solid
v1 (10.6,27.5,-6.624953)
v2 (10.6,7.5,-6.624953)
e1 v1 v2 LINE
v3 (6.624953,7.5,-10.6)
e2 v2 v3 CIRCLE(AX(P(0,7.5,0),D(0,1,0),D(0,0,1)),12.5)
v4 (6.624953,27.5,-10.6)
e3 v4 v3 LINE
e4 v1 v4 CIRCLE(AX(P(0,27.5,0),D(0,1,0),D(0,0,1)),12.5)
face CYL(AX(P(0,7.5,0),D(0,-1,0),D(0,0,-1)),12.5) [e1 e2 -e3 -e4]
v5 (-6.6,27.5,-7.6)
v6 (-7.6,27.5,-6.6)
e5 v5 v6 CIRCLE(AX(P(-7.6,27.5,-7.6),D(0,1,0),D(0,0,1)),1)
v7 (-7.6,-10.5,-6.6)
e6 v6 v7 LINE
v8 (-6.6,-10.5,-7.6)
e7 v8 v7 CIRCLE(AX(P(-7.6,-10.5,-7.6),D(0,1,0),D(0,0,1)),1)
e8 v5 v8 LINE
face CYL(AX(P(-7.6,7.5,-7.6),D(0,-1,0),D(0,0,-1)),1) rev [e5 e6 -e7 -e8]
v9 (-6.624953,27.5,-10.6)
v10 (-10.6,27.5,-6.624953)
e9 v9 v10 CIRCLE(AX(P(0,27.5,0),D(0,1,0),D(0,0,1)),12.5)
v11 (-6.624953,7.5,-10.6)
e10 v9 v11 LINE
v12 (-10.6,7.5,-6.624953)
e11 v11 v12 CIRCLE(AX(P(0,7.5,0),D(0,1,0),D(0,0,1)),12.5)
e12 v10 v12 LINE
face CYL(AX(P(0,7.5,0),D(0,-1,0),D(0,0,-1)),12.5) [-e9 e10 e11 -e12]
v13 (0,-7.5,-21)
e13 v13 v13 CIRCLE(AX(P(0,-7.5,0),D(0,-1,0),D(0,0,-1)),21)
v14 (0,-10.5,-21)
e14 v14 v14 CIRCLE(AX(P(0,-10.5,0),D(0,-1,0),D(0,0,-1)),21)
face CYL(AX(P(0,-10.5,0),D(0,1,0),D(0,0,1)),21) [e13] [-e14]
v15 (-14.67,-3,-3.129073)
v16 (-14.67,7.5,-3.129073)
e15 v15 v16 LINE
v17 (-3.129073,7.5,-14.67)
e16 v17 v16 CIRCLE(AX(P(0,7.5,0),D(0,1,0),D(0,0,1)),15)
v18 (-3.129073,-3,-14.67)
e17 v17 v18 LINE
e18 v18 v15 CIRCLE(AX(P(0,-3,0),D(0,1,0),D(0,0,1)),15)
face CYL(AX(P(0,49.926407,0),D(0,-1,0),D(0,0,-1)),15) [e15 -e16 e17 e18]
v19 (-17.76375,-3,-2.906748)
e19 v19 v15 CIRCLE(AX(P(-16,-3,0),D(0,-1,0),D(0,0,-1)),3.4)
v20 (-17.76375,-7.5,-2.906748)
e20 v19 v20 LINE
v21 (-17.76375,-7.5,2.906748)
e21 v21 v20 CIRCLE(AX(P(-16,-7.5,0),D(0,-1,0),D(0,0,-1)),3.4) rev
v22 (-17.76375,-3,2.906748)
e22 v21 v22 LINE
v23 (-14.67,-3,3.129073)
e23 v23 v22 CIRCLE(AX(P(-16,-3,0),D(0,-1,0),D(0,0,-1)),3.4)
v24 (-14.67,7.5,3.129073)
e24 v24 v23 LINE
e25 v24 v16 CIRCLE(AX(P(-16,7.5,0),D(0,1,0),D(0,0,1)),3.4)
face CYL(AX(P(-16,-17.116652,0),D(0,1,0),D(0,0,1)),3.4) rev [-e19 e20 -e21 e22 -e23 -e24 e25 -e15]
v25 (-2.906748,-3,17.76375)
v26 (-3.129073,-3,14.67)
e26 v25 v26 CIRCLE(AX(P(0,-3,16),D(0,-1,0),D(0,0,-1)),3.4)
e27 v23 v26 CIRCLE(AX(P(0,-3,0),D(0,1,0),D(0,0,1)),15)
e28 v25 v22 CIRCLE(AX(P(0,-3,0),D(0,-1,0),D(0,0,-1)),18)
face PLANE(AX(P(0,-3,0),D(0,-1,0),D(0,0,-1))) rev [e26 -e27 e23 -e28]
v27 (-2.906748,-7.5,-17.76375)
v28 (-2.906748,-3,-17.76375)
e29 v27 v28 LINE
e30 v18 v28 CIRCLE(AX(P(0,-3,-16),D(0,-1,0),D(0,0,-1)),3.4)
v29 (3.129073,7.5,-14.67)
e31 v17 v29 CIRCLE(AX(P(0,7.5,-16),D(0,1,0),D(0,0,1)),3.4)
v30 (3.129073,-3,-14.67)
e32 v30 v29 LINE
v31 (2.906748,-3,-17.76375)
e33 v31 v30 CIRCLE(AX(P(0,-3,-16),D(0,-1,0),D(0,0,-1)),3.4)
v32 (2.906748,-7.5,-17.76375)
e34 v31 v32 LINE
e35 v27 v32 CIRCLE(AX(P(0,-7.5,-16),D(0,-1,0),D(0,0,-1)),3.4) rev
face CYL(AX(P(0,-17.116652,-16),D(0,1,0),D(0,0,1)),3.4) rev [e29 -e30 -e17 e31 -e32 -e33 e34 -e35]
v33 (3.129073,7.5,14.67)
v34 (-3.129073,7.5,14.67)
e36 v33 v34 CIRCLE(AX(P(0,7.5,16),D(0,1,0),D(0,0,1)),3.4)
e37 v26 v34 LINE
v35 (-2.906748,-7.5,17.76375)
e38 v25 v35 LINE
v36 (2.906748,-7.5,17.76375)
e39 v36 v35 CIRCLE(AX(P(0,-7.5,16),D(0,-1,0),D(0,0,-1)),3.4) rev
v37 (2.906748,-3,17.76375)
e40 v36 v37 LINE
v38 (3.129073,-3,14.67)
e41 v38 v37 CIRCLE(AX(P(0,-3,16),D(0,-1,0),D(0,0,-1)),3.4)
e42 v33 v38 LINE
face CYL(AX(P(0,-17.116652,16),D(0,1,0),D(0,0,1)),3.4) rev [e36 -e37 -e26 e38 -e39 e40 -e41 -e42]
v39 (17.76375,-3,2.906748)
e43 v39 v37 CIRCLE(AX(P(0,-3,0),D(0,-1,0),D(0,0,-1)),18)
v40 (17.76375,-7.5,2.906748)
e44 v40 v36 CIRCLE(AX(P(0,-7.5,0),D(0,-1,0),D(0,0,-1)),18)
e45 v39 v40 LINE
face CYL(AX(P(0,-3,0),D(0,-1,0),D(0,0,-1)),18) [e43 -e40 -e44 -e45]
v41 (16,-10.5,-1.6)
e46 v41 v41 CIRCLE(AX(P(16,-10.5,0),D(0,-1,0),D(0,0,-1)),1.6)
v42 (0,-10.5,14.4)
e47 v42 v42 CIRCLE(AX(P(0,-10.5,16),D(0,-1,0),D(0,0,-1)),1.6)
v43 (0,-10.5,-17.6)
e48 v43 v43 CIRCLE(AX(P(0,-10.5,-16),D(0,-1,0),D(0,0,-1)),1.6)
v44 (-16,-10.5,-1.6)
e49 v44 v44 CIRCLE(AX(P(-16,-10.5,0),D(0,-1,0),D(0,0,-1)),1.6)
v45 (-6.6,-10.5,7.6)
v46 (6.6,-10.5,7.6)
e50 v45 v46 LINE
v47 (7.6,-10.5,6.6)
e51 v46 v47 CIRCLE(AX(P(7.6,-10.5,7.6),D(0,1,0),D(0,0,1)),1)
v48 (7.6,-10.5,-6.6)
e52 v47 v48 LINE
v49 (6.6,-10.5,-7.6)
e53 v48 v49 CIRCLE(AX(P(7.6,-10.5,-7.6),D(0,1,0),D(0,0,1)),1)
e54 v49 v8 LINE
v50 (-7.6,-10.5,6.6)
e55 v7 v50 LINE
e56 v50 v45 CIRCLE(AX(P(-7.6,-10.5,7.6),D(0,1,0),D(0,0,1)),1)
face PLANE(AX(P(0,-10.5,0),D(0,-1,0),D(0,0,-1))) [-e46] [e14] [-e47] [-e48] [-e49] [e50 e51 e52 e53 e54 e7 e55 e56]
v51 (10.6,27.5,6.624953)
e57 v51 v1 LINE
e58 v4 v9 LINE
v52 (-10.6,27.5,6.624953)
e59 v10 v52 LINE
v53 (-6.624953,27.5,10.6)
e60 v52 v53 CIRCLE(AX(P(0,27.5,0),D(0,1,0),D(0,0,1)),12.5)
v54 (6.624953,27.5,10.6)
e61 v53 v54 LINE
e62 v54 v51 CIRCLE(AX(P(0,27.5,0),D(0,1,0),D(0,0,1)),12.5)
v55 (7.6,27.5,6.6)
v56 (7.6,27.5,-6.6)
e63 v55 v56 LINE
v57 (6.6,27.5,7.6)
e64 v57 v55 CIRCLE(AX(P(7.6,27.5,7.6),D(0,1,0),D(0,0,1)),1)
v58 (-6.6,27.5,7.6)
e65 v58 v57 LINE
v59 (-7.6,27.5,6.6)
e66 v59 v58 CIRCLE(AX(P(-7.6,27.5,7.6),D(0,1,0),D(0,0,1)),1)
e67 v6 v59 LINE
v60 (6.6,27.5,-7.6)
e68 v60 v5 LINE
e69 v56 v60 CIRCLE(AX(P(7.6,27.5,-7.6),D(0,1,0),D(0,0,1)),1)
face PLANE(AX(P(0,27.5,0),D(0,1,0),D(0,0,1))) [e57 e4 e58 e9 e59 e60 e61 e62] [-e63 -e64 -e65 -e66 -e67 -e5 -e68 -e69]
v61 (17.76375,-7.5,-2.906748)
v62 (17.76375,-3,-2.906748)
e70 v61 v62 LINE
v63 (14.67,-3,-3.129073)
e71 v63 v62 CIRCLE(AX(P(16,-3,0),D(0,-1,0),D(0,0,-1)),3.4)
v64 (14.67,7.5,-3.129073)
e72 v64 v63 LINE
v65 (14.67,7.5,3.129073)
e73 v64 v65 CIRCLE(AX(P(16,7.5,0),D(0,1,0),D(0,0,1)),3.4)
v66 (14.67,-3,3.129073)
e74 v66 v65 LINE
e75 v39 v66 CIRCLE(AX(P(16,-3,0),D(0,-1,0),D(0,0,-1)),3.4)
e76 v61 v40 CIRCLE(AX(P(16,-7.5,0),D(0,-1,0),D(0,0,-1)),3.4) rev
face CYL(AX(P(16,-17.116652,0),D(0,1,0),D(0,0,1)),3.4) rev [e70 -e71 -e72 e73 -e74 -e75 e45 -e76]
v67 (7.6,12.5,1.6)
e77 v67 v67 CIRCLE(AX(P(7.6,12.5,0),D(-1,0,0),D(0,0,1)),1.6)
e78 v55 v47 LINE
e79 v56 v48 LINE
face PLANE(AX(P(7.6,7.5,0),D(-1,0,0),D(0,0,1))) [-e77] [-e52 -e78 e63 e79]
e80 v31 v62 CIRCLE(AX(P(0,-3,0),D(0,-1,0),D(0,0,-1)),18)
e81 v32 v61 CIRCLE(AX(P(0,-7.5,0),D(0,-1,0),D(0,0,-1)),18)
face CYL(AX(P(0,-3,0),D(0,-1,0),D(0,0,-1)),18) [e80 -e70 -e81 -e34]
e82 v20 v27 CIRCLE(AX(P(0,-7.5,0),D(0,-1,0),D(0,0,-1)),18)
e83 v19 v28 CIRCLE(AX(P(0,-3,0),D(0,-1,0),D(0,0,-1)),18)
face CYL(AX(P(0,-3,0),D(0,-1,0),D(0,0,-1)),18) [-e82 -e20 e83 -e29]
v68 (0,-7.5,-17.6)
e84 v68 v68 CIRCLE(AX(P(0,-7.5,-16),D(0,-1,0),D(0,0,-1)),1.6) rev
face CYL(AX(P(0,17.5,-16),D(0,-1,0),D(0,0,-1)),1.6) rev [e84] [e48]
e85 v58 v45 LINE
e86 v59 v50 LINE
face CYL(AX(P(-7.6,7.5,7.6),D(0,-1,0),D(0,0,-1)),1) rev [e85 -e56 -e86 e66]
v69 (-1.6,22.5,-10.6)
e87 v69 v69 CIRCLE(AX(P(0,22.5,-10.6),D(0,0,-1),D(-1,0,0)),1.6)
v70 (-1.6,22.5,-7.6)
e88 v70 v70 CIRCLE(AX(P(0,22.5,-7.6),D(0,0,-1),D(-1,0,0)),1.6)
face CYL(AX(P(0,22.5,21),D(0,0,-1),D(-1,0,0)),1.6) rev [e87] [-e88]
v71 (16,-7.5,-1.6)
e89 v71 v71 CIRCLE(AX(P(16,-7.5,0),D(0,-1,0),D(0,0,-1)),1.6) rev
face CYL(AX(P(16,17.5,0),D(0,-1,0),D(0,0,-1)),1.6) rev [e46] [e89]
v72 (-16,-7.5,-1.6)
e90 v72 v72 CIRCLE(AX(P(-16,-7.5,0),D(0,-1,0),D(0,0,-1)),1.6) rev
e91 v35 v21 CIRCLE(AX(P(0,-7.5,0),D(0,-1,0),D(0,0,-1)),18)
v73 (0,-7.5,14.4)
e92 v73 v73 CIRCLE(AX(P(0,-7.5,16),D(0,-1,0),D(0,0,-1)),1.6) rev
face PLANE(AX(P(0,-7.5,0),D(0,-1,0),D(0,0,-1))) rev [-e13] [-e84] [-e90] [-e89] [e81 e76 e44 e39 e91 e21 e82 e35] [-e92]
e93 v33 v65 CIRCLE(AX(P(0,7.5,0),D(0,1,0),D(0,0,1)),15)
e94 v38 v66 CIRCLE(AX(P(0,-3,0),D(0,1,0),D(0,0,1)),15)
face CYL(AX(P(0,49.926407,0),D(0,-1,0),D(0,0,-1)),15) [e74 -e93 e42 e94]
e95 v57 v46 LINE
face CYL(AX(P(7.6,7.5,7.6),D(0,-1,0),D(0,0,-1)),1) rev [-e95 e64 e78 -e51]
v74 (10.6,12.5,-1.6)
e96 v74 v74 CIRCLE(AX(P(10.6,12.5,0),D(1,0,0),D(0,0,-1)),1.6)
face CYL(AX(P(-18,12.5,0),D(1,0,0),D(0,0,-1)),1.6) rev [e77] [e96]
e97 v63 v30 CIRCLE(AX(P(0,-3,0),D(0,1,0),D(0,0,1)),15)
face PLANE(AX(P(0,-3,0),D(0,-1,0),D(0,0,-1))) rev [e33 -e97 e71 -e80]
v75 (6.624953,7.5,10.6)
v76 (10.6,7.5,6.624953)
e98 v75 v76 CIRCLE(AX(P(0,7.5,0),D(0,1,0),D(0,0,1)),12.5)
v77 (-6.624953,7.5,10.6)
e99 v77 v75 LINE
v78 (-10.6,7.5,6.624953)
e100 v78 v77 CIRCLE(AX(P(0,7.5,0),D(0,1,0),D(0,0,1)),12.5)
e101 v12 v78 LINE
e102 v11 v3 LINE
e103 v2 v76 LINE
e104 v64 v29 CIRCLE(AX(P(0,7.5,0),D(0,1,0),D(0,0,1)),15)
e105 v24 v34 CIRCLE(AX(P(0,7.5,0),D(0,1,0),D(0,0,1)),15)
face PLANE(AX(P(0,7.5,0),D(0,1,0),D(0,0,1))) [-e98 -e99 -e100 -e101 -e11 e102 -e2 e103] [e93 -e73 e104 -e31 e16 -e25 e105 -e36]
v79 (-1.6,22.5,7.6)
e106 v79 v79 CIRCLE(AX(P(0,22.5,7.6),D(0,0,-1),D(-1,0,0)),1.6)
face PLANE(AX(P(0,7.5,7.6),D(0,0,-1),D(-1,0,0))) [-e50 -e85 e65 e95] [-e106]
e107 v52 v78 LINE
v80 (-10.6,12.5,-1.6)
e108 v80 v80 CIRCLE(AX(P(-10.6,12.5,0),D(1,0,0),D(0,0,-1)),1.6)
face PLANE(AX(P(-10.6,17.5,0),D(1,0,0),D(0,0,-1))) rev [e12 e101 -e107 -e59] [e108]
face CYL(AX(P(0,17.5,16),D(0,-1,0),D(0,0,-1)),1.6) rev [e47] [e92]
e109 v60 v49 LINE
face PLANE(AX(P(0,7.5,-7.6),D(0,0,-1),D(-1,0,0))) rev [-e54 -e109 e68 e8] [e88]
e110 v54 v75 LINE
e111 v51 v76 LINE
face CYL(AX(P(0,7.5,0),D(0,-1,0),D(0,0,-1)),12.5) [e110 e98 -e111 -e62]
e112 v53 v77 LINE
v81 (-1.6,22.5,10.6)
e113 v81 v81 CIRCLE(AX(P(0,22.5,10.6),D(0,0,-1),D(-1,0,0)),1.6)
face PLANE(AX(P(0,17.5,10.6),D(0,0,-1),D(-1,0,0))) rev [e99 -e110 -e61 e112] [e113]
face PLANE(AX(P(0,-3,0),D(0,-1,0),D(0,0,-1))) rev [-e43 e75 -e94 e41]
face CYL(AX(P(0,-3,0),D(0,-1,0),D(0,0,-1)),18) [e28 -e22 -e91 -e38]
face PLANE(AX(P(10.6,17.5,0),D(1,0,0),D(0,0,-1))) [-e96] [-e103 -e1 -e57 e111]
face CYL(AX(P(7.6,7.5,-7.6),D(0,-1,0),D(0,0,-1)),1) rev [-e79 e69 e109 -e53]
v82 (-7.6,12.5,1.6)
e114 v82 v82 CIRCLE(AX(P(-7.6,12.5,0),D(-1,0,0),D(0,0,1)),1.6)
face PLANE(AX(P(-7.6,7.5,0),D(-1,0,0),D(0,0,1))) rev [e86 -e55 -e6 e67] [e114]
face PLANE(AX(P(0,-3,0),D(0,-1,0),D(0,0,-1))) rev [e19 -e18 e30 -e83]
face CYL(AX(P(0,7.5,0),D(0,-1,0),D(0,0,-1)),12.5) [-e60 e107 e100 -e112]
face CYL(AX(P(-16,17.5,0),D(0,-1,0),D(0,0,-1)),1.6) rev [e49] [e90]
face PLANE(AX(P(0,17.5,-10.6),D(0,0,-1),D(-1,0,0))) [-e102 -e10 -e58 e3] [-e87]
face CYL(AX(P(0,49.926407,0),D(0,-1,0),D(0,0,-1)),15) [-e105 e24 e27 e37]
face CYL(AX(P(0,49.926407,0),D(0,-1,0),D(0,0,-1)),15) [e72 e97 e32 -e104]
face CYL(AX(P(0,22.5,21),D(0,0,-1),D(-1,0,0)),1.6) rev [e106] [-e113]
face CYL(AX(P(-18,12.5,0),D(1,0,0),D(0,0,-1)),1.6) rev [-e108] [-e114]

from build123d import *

# Parameters (mm, degrees)
SKETCH_1_R               = 12.5
EXTRUDE_1_DEPTH          = 7.5
EXTRUDE_2_DEPTH          = 10
EXTRUDE_START            = -4.5
SKETCH_3_R               = 18
SKETCH_3_R_2             = 12.5
EXTRUDE_3_DEPTH          = 4.5
SKETCH_4_R               = 2.1
CUT_EXTRUDE_1_DEPTH      = 39.055354
SKETCH_5_R               = 1.6
CUT_EXTRUDE_2_DEPTH      = 39.055354
CUT_EXTRUDE_START        = -10
CUT_EXTRUDE_3_DEPTH      = 10
SKETCH_7_R               = 21
EXTRUDE_4_DEPTH          = 3
SKETCH_8_R               = 1.6
CUT_EXTRUDE_4_DEPTH      = 41.816663
SKETCH_13_R              = 15
SKETCH_13_R_2            = 12.5
EXTRUDE_6_DEPTH          = 10.5
CUT_EXTRUDE_6_DEPTH      = 39.820098
CUT_EXTRUDE_6_DEPTH_BACK = 39.820098
CUT_EXTRUDE_START_2      = 10.5
SKETCH_9_R               = 3.4
CUT_EXTRUDE_5_DEPTH      = 15
EXTRUDE_5_DEPTH          = 10
SKETCH_12_R              = 1.6
CUT_EXTRUDE_7_DEPTH      = 47.859471


# Read off the part's stored shape, not the designer's step: 凸台-拉伸2
with BuildPart() as part:
    # 草图1 → 凸台-拉伸1 (new, symmetric)
    with BuildSketch(Plane(origin=(0, 0, 0), x_dir=(1, 0, 0), z_dir=(0, 1, 0))):
        with Locations(Location((0, 0, 0), (0, 0, 270))):
            Circle(SKETCH_1_R)
        with BuildLine():
            Line((6.6, -7.6), (-6.6, -7.6))
            ThreePointArc((-6.6, -7.6), (-8.307107, -8.307107), (-7.6, -6.6))
            Line((-7.6, -6.6), (-7.6, 6.6))
            ThreePointArc((-7.6, 6.6), (-8.307107, 8.307107), (-6.6, 7.6))
            Line((-6.6, 7.6), (6.6, 7.6))
            ThreePointArc((6.6, 7.6), (7.6, 8.6), (8.6, 7.6))
            ThreePointArc((8.6, 7.6), (8.307107, 6.892893), (7.6, 6.6))
            Line((7.6, 6.6), (7.6, -6.6))
            ThreePointArc((7.6, -6.6), (8.307107, -6.892893), (8.6, -7.6))
            ThreePointArc((8.6, -7.6), (7.6, -8.6), (6.6, -7.6))
        make_face(mode=Mode.SUBTRACT)
    extrude(amount=EXTRUDE_1_DEPTH, both=True)

    # 凸台-拉伸2 outline → 凸台-拉伸2 (add)
    with BuildSketch(Plane.XZ.offset(7.5)):
        with BuildLine():
            Line((10.6, -6.624953), (10.6, 6.624953))
            ThreePointArc((10.6, 6.624953), (8.838835, 8.838835), (6.624953, 10.6))
            Line((6.624953, 10.6), (-6.624953, 10.6))
            ThreePointArc((-6.624953, 10.6), (-8.838835, 8.838835), (-10.6, 6.624953))
            Line((-10.6, 6.624953), (-10.6, -6.624953))
            ThreePointArc((-10.6, -6.624953), (-8.838835, -8.838835), (-6.624953, -10.6))
            Line((-6.624953, -10.6), (6.624953, -10.6))
            ThreePointArc((6.624953, -10.6), (8.838835, -8.838835), (10.6, -6.624953))
        make_face()
        with BuildLine():
            ThreePointArc((-6.6, -7.6), (-8.307107, -8.307107), (-7.6, -6.6))
            Line((-7.6, -6.6), (-7.6, 6.6))
            ThreePointArc((-7.6, 6.6), (-8.307107, 8.307107), (-6.6, 7.6))
            Line((-6.6, 7.6), (6.6, 7.6))
            ThreePointArc((6.6, 7.6), (8.307107, 8.307107), (7.6, 6.6))
            Line((7.6, 6.6), (7.6, -6.6))
            ThreePointArc((7.6, -6.6), (8.307107, -8.307107), (6.6, -7.6))
            Line((6.6, -7.6), (-6.6, -7.6))
        make_face(mode=Mode.SUBTRACT)
    extrude_2 = extrude(amount=EXTRUDE_2_DEPTH)

    # 镜向1: 凸台-拉伸2 across plane
    add(extrude_2.mirror(Plane.ZX))

    # 草图3 → 凸台-拉伸3 (add)
    with BuildSketch(Plane.XZ.offset(7.5).offset(EXTRUDE_START)):
        with Locations(Location((0, 0, 0), (0, 0, 270))):
            Circle(SKETCH_3_R)
        with Locations(Location((0, 0, 0), (0, 0, 270))):
            Circle(SKETCH_3_R_2, mode=Mode.SUBTRACT)
    extrude(amount=EXTRUDE_3_DEPTH)

    # 草图4 → 切除-拉伸1 (cut, through all)
    with BuildSketch(Plane.XY.offset(10.6)):
        with Locations((0, -12.5)):
            Circle(SKETCH_4_R)
    extrude(amount=-CUT_EXTRUDE_1_DEPTH, mode=Mode.SUBTRACT)

    # 草图5 → 切除-拉伸2 (cut, through all)
    with BuildSketch(Plane(origin=(10.6, 0, 0), x_dir=(0, 0, -1), z_dir=(1, 0, 0))):
        with Locations((0, 12.5)):
            Circle(SKETCH_5_R)
    extrude(amount=-CUT_EXTRUDE_2_DEPTH, mode=Mode.SUBTRACT)

    # 草图6 → 切除-拉伸3 (cut)
    with BuildSketch(Plane.XZ.offset(17.5).offset(CUT_EXTRUDE_START)):
        with BuildLine():
            Line((10.6, -6.624953), (10.6, 6.624953))
            ThreePointArc((10.6, 6.624953), (8.838835, 8.838835), (6.624953, 10.6))
            Line((6.624953, 10.6), (-6.624953, 10.6))
            ThreePointArc((-6.624953, 10.6), (-8.838835, 8.838835), (-10.6, 6.624953))
            Line((-10.6, 6.624953), (-10.6, -6.624953))
            ThreePointArc((-10.6, -6.624953), (-8.838835, -8.838835), (-6.624953, -10.6))
            Line((-6.624953, -10.6), (6.624953, -10.6))
            ThreePointArc((6.624953, -10.6), (8.838835, -8.838835), (10.6, -6.624953))
        make_face()
    extrude(amount=CUT_EXTRUDE_3_DEPTH, mode=Mode.SUBTRACT)

    # 草图7 → 凸台-拉伸4 (add)
    with BuildSketch(Plane.XZ.offset(7.5)):
        with Locations(Location((0, 0, 0), (0, 0, 270))):
            Circle(SKETCH_7_R)
    extrude(amount=EXTRUDE_4_DEPTH)

    # 草图8 → 切除-拉伸4 (cut, through all)
    with BuildSketch(Plane.XZ.offset(10.5)):
        with Locations(Location((0, 16, 0), (0, 0, 270))):
            Circle(SKETCH_8_R)
        with Locations(Location((16, 0, 0), (0, 0, 270))):
            Circle(SKETCH_8_R)
        with Locations(Location((0, -16, 0), (0, 0, 270))):
            Circle(SKETCH_8_R)
        with Locations(Location((-16, 0, 0), (0, 0, 270))):
            Circle(SKETCH_8_R)
    extrude(amount=-CUT_EXTRUDE_4_DEPTH, mode=Mode.SUBTRACT)

    # 草图13 → 凸台-拉伸6 (add)
    with BuildSketch(Plane(origin=(0, -3, 0), x_dir=(1, 0, 0), z_dir=(0, 1, 0))):
        with Locations(Location((0, 0, 0), (0, 0, 85.379415))):
            Circle(SKETCH_13_R)
        Circle(SKETCH_13_R_2, mode=Mode.SUBTRACT)
    extrude(amount=EXTRUDE_6_DEPTH)

    # 草图10 → 切除-拉伸6 (cut, two sides: drawn at the far end of the back side and taken through both)
    with BuildSketch(Plane(origin=(0, -7.5, 0), x_dir=(1, 0, 0), z_dir=(0, 1, 0)).offset(-CUT_EXTRUDE_6_DEPTH_BACK)):
        with BuildLine():
            Line((-7.6, 6.6), (-7.6, -6.6))
            ThreePointArc((-7.6, -6.6), (-8.307107, -8.307107), (-6.6, -7.6))
            Line((-6.6, -7.6), (6.6, -7.6))
            ThreePointArc((6.6, -7.6), (8.307107, -8.307107), (7.6, -6.6))
            Line((7.6, -6.6), (7.6, 6.6))
            ThreePointArc((7.6, 6.6), (8.307107, 8.307107), (6.6, 7.6))
            Line((6.6, 7.6), (-6.6, 7.6))
            ThreePointArc((-6.6, 7.6), (-8.307107, 8.307107), (-7.6, 6.6))
        make_face()
    extrude(amount=CUT_EXTRUDE_6_DEPTH + CUT_EXTRUDE_6_DEPTH_BACK, mode=Mode.SUBTRACT)

    # 草图9 → 切除-拉伸5 (cut)
    with BuildSketch(Plane(origin=(0, -3, 0), x_dir=(1, 0, 0), z_dir=(0, 1, 0)).offset(CUT_EXTRUDE_START_2)):
        with Locations((0, -16)):
            Circle(SKETCH_9_R)
        with Locations((16, 0)):
            Circle(SKETCH_9_R)
        with Locations((0, 16)):
            Circle(SKETCH_9_R)
        with Locations((-16, 0)):
            Circle(SKETCH_9_R)
    extrude(amount=-CUT_EXTRUDE_5_DEPTH, mode=Mode.SUBTRACT)

    # 草图11 → 凸台-拉伸5 (add)
    with BuildSketch(Plane(origin=(0, 17.5, 0), x_dir=(1, 0, 0), z_dir=(0, 1, 0))):
        with BuildLine():
            Line((6.624953, 10.6), (-6.624953, 10.6))
            ThreePointArc((-6.624953, 10.6), (-8.838835, 8.838835), (-10.6, 6.624953))
            Line((-10.6, 6.624953), (-10.6, -6.624953))
            ThreePointArc((-10.6, -6.624953), (-8.838835, -8.838835), (-6.624953, -10.6))
            Line((-6.624953, -10.6), (6.624953, -10.6))
            ThreePointArc((6.624953, -10.6), (8.838835, -8.838835), (10.6, -6.624953))
            Line((10.6, -6.624953), (10.6, 6.624953))
            ThreePointArc((10.6, 6.624953), (8.838835, 8.838835), (6.624953, 10.6))
        make_face()
        with BuildLine():
            Line((-6.6, -7.6), (6.6, -7.6))
            ThreePointArc((6.6, -7.6), (8.307107, -8.307107), (7.6, -6.6))
            Line((7.6, -6.6), (7.6, 6.6))
            ThreePointArc((7.6, 6.6), (8.307107, 8.307107), (6.6, 7.6))
            Line((6.6, 7.6), (-6.6, 7.6))
            ThreePointArc((-6.6, 7.6), (-8.307107, 8.307107), (-7.6, 6.6))
            Line((-7.6, 6.6), (-7.6, -6.6))
            ThreePointArc((-7.6, -6.6), (-8.307107, -8.307107), (-6.6, -7.6))
        make_face(mode=Mode.SUBTRACT)
    extrude(amount=EXTRUDE_5_DEPTH)

    # 草图12 → 切除-拉伸7 (cut, through all)
    with BuildSketch(Plane(origin=(0, 0, -10.6), x_dir=(-1, 0, 0), z_dir=(0, 0, -1))):
        with Locations((0, 22.5)):
            Circle(SKETCH_12_R)
    extrude(amount=-CUT_EXTRUDE_7_DEPTH, mode=Mode.SUBTRACT)


solid = part.part
